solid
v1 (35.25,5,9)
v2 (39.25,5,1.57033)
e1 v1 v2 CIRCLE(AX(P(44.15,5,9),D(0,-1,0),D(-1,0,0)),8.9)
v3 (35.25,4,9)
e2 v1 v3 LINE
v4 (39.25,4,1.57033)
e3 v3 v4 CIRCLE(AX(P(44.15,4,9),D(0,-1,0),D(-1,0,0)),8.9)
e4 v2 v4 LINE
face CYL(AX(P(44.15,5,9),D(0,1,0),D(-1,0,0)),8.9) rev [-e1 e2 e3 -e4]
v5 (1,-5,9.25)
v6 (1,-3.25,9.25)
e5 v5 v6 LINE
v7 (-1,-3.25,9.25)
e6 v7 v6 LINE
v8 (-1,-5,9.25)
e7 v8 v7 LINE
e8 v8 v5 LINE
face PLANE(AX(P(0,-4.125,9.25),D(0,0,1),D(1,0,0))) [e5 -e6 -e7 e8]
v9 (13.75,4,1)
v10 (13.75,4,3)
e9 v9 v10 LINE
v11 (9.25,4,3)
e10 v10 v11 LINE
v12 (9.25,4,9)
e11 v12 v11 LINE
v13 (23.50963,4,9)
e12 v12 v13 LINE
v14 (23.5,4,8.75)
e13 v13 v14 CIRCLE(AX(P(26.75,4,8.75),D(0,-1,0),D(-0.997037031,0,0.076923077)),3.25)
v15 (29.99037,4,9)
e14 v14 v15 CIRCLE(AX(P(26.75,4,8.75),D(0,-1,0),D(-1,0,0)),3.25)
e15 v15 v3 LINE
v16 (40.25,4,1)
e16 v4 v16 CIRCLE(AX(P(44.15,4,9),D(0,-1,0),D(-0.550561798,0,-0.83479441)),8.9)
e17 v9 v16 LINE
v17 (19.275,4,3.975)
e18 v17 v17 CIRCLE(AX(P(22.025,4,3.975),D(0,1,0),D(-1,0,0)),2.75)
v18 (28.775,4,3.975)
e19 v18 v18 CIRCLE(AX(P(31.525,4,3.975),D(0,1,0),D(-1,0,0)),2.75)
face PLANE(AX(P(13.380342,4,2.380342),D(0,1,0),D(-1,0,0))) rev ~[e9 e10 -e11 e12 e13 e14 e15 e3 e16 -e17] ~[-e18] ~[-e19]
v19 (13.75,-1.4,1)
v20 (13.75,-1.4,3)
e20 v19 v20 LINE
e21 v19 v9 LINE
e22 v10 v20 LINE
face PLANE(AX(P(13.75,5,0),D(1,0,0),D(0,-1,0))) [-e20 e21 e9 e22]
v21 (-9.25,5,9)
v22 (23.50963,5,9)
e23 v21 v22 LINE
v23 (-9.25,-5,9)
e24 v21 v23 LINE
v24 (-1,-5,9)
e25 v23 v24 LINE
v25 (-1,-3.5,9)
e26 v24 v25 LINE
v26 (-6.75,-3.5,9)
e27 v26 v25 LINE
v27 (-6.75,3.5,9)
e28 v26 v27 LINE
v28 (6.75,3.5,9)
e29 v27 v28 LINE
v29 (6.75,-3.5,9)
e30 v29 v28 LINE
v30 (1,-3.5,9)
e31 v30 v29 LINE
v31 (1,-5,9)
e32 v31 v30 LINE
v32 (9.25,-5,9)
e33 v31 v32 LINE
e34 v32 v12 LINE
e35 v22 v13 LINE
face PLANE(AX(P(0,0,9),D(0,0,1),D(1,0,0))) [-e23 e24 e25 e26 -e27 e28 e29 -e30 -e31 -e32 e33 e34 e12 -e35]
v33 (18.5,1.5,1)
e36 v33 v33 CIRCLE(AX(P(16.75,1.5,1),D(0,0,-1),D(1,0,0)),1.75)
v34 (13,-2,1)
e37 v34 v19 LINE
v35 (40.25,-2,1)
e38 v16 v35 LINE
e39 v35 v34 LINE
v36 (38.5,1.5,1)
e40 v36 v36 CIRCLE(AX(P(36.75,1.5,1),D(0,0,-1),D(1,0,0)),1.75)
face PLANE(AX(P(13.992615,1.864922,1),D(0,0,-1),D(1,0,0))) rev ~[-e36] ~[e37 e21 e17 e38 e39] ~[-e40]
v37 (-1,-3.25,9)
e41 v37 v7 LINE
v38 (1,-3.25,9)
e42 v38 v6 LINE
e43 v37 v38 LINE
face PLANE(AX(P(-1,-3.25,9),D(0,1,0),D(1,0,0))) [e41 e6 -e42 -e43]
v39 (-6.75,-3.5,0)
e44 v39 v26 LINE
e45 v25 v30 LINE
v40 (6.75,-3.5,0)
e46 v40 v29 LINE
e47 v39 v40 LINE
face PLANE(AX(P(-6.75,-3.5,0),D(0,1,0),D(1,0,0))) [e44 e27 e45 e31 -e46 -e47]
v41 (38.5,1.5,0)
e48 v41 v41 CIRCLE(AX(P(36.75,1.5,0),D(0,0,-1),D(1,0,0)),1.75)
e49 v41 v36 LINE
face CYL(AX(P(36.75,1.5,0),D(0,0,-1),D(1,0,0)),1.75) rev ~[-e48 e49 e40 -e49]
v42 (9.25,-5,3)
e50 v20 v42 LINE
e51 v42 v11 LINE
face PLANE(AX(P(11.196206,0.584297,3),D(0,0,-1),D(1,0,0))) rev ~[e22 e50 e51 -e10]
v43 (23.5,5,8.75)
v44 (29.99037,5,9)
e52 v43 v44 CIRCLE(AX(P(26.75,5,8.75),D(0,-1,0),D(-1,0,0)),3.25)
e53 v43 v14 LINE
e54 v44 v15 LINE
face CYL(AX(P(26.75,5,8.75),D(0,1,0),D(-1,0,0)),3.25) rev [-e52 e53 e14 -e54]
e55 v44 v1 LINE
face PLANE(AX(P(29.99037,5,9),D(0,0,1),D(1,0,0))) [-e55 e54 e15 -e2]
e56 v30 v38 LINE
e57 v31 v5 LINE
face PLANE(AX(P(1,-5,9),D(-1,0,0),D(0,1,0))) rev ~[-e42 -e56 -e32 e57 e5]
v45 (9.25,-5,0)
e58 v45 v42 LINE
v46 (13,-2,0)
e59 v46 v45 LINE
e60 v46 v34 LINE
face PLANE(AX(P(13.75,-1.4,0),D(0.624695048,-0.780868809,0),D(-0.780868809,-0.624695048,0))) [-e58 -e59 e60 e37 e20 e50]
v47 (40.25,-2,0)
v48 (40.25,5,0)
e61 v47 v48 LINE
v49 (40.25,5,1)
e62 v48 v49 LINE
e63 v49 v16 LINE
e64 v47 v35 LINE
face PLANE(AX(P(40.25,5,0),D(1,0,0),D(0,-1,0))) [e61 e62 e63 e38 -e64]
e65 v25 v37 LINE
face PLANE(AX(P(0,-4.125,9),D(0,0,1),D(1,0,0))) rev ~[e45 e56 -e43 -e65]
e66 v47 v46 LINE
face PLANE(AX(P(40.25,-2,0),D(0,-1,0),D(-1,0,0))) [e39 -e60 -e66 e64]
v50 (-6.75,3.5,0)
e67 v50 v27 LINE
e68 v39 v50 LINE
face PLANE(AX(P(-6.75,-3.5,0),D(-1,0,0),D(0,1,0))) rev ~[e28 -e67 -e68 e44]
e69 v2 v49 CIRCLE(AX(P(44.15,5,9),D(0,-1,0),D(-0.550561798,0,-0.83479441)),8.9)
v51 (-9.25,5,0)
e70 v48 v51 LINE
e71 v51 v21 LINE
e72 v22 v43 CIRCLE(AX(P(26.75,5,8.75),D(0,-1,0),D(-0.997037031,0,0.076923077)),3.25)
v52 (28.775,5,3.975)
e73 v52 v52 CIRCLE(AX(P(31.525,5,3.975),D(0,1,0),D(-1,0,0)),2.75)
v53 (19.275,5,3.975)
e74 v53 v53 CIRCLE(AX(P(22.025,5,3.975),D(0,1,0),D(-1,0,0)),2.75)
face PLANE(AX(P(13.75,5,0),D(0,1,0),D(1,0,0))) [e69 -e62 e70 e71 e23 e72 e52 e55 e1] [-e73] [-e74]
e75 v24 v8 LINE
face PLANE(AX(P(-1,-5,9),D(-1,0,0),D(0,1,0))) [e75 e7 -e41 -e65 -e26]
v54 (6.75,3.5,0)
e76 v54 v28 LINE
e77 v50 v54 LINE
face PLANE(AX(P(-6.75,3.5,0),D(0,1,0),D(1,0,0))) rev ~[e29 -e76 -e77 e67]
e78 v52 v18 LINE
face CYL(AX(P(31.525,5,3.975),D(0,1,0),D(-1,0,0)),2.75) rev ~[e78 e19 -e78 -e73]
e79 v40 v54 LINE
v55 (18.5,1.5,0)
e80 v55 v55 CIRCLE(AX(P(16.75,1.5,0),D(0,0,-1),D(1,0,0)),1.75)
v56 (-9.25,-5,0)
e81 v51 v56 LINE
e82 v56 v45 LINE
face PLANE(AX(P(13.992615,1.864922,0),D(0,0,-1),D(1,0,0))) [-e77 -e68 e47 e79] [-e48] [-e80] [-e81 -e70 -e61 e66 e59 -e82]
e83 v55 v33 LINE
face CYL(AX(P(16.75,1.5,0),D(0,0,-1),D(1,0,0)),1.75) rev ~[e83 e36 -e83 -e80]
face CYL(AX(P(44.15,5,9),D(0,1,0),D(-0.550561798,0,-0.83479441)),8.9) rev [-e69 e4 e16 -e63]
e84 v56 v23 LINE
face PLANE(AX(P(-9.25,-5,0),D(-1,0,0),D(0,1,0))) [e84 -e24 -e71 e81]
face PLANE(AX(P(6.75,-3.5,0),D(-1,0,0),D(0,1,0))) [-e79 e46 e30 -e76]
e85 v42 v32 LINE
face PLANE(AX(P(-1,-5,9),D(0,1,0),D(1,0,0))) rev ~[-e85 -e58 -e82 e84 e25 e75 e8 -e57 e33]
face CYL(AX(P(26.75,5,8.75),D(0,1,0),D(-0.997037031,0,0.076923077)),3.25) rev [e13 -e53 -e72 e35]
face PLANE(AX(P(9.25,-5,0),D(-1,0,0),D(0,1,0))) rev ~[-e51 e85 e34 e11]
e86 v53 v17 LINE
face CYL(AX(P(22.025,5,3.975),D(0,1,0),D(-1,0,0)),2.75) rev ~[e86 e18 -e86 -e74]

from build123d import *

# Parameters (mm, degrees)
F0_W     = 18.5
F0_H     = 10
F0_W_2   = 13.5
F0_H_2   = 7
F1_DEPTH = 9
F3_DEPTH = 3
F2_W     = 25
F2_H     = 1
F2_H_2   = 5
F2_R     = 1.75
F4_DEPTH = 1
F5_R     = 2.75
F6_DEPTH = 1
F7_W     = 2
F7_H     = 1.75
F8_DEPTH = 0.25


with BuildPart() as f1:
    # F0 (on Top) → F1 (new body)
    with BuildSketch(Plane.XY):
        Rectangle(F0_W, F0_H)
        Rectangle(F0_W_2, F0_H_2, mode=Mode.SUBTRACT)
    extrude(amount=F1_DEPTH)

    # F2 (on face) → F3 (join)
    with BuildSketch(Plane(origin=(0, 0, 0), x_dir=(1, 0, 0), z_dir=(0, 0, -1))):
        Polygon((9.25, -5), (13.75, -5), (13.75, 1.4), (13, 2), (9.25, 5), align=None)
    extrude(amount=-F3_DEPTH)

    # F2 (on face) → F4 (join)
    with BuildSketch(Plane(origin=(0, 0, 0), x_dir=(1, 0, 0), z_dir=(0, 0, -1))):
        Polygon((13.75, -5), (14.25, -5), (14.25, -4), (14.25, 1), (13.75, 1.4), align=None)
        Polygon((39.25, -4), (39.25, -5), (40.25, -5), (40.25, 2), (13, 2), (13.75, 1.4), (14.25, 1), (39.25, 1), align=None)
        with Locations((26.75, -4.5)):
            Rectangle(F2_W, F2_H)
        with Locations((26.75, -1.5)):
            Rectangle(F2_W, F2_H_2)
        with Locations((16.75, -1.5)):
            Circle(F2_R, mode=Mode.SUBTRACT)
        with Locations((36.75, -1.5)):
            Circle(F2_R, mode=Mode.SUBTRACT)
    extrude(amount=-F4_DEPTH)

    # F5 (on face) → F6 (join)
    with BuildSketch(Plane(origin=(0, 5, 0), x_dir=(-1, 0, 0), z_dir=(0, 1, 0))):
        Polygon((-13.75, 1), (-14.25, 1), (-39.25, 1), (-40.25, 1), (-40.25, 0), (9.25, 0), (9.25, 9), (-9.25, 9), (-9.25, 3), (-9.25, 1), align=None)
        with BuildLine():
            Line((-39.25, 1), (-14.25, 1))
            Line((-14.25, 1), (-14.25, 9))
            Line((-14.25, 9), (-23.5096296508, 9))
            ThreePointArc((-23.5096296508, 9), (-23.502408305, 8.8750926958), (-23.5, 8.75))
            ThreePointArc((-23.5, 8.75), (-26.8750926958, 5.502408305), (-29.9903703492, 9))
            Line((-29.9903703492, 9), (-35.25, 9))
            ThreePointArc((-35.25, 9), (-36.3135467206, 4.7809953781), (-39.25, 1.5703297516))
            Line((-39.25, 1.5703297516), (-39.25, 1))
        make_face()
        with Locations((-31.525, 3.975)):
            Circle(F5_R, mode=Mode.SUBTRACT)
        with Locations((-22.025, 3.975)):
            Circle(F5_R, mode=Mode.SUBTRACT)
        Polygon((-14.25, 9), (-14.25, 1), (-13.75, 1), (-13.75, 3), (-9.25, 3), (-9.25, 9), align=None)
        with BuildLine():
            Line((-40.25, 1), (-39.25, 1))
            Line((-39.25, 1), (-39.25, 1.5703297516))
            ThreePointArc((-39.25, 1.5703297516), (-39.7407688872, 1.2689793045), (-40.25, 1))
        make_face()
    extrude(amount=-F6_DEPTH)

    # F7 (on face) → F8 (join)
    with BuildSketch(Plane.XY.offset(9)):
        with Locations((0, -4.125)):
            Rectangle(F7_W, F7_H)
    extrude(amount=F8_DEPTH)


solid = f1.part
